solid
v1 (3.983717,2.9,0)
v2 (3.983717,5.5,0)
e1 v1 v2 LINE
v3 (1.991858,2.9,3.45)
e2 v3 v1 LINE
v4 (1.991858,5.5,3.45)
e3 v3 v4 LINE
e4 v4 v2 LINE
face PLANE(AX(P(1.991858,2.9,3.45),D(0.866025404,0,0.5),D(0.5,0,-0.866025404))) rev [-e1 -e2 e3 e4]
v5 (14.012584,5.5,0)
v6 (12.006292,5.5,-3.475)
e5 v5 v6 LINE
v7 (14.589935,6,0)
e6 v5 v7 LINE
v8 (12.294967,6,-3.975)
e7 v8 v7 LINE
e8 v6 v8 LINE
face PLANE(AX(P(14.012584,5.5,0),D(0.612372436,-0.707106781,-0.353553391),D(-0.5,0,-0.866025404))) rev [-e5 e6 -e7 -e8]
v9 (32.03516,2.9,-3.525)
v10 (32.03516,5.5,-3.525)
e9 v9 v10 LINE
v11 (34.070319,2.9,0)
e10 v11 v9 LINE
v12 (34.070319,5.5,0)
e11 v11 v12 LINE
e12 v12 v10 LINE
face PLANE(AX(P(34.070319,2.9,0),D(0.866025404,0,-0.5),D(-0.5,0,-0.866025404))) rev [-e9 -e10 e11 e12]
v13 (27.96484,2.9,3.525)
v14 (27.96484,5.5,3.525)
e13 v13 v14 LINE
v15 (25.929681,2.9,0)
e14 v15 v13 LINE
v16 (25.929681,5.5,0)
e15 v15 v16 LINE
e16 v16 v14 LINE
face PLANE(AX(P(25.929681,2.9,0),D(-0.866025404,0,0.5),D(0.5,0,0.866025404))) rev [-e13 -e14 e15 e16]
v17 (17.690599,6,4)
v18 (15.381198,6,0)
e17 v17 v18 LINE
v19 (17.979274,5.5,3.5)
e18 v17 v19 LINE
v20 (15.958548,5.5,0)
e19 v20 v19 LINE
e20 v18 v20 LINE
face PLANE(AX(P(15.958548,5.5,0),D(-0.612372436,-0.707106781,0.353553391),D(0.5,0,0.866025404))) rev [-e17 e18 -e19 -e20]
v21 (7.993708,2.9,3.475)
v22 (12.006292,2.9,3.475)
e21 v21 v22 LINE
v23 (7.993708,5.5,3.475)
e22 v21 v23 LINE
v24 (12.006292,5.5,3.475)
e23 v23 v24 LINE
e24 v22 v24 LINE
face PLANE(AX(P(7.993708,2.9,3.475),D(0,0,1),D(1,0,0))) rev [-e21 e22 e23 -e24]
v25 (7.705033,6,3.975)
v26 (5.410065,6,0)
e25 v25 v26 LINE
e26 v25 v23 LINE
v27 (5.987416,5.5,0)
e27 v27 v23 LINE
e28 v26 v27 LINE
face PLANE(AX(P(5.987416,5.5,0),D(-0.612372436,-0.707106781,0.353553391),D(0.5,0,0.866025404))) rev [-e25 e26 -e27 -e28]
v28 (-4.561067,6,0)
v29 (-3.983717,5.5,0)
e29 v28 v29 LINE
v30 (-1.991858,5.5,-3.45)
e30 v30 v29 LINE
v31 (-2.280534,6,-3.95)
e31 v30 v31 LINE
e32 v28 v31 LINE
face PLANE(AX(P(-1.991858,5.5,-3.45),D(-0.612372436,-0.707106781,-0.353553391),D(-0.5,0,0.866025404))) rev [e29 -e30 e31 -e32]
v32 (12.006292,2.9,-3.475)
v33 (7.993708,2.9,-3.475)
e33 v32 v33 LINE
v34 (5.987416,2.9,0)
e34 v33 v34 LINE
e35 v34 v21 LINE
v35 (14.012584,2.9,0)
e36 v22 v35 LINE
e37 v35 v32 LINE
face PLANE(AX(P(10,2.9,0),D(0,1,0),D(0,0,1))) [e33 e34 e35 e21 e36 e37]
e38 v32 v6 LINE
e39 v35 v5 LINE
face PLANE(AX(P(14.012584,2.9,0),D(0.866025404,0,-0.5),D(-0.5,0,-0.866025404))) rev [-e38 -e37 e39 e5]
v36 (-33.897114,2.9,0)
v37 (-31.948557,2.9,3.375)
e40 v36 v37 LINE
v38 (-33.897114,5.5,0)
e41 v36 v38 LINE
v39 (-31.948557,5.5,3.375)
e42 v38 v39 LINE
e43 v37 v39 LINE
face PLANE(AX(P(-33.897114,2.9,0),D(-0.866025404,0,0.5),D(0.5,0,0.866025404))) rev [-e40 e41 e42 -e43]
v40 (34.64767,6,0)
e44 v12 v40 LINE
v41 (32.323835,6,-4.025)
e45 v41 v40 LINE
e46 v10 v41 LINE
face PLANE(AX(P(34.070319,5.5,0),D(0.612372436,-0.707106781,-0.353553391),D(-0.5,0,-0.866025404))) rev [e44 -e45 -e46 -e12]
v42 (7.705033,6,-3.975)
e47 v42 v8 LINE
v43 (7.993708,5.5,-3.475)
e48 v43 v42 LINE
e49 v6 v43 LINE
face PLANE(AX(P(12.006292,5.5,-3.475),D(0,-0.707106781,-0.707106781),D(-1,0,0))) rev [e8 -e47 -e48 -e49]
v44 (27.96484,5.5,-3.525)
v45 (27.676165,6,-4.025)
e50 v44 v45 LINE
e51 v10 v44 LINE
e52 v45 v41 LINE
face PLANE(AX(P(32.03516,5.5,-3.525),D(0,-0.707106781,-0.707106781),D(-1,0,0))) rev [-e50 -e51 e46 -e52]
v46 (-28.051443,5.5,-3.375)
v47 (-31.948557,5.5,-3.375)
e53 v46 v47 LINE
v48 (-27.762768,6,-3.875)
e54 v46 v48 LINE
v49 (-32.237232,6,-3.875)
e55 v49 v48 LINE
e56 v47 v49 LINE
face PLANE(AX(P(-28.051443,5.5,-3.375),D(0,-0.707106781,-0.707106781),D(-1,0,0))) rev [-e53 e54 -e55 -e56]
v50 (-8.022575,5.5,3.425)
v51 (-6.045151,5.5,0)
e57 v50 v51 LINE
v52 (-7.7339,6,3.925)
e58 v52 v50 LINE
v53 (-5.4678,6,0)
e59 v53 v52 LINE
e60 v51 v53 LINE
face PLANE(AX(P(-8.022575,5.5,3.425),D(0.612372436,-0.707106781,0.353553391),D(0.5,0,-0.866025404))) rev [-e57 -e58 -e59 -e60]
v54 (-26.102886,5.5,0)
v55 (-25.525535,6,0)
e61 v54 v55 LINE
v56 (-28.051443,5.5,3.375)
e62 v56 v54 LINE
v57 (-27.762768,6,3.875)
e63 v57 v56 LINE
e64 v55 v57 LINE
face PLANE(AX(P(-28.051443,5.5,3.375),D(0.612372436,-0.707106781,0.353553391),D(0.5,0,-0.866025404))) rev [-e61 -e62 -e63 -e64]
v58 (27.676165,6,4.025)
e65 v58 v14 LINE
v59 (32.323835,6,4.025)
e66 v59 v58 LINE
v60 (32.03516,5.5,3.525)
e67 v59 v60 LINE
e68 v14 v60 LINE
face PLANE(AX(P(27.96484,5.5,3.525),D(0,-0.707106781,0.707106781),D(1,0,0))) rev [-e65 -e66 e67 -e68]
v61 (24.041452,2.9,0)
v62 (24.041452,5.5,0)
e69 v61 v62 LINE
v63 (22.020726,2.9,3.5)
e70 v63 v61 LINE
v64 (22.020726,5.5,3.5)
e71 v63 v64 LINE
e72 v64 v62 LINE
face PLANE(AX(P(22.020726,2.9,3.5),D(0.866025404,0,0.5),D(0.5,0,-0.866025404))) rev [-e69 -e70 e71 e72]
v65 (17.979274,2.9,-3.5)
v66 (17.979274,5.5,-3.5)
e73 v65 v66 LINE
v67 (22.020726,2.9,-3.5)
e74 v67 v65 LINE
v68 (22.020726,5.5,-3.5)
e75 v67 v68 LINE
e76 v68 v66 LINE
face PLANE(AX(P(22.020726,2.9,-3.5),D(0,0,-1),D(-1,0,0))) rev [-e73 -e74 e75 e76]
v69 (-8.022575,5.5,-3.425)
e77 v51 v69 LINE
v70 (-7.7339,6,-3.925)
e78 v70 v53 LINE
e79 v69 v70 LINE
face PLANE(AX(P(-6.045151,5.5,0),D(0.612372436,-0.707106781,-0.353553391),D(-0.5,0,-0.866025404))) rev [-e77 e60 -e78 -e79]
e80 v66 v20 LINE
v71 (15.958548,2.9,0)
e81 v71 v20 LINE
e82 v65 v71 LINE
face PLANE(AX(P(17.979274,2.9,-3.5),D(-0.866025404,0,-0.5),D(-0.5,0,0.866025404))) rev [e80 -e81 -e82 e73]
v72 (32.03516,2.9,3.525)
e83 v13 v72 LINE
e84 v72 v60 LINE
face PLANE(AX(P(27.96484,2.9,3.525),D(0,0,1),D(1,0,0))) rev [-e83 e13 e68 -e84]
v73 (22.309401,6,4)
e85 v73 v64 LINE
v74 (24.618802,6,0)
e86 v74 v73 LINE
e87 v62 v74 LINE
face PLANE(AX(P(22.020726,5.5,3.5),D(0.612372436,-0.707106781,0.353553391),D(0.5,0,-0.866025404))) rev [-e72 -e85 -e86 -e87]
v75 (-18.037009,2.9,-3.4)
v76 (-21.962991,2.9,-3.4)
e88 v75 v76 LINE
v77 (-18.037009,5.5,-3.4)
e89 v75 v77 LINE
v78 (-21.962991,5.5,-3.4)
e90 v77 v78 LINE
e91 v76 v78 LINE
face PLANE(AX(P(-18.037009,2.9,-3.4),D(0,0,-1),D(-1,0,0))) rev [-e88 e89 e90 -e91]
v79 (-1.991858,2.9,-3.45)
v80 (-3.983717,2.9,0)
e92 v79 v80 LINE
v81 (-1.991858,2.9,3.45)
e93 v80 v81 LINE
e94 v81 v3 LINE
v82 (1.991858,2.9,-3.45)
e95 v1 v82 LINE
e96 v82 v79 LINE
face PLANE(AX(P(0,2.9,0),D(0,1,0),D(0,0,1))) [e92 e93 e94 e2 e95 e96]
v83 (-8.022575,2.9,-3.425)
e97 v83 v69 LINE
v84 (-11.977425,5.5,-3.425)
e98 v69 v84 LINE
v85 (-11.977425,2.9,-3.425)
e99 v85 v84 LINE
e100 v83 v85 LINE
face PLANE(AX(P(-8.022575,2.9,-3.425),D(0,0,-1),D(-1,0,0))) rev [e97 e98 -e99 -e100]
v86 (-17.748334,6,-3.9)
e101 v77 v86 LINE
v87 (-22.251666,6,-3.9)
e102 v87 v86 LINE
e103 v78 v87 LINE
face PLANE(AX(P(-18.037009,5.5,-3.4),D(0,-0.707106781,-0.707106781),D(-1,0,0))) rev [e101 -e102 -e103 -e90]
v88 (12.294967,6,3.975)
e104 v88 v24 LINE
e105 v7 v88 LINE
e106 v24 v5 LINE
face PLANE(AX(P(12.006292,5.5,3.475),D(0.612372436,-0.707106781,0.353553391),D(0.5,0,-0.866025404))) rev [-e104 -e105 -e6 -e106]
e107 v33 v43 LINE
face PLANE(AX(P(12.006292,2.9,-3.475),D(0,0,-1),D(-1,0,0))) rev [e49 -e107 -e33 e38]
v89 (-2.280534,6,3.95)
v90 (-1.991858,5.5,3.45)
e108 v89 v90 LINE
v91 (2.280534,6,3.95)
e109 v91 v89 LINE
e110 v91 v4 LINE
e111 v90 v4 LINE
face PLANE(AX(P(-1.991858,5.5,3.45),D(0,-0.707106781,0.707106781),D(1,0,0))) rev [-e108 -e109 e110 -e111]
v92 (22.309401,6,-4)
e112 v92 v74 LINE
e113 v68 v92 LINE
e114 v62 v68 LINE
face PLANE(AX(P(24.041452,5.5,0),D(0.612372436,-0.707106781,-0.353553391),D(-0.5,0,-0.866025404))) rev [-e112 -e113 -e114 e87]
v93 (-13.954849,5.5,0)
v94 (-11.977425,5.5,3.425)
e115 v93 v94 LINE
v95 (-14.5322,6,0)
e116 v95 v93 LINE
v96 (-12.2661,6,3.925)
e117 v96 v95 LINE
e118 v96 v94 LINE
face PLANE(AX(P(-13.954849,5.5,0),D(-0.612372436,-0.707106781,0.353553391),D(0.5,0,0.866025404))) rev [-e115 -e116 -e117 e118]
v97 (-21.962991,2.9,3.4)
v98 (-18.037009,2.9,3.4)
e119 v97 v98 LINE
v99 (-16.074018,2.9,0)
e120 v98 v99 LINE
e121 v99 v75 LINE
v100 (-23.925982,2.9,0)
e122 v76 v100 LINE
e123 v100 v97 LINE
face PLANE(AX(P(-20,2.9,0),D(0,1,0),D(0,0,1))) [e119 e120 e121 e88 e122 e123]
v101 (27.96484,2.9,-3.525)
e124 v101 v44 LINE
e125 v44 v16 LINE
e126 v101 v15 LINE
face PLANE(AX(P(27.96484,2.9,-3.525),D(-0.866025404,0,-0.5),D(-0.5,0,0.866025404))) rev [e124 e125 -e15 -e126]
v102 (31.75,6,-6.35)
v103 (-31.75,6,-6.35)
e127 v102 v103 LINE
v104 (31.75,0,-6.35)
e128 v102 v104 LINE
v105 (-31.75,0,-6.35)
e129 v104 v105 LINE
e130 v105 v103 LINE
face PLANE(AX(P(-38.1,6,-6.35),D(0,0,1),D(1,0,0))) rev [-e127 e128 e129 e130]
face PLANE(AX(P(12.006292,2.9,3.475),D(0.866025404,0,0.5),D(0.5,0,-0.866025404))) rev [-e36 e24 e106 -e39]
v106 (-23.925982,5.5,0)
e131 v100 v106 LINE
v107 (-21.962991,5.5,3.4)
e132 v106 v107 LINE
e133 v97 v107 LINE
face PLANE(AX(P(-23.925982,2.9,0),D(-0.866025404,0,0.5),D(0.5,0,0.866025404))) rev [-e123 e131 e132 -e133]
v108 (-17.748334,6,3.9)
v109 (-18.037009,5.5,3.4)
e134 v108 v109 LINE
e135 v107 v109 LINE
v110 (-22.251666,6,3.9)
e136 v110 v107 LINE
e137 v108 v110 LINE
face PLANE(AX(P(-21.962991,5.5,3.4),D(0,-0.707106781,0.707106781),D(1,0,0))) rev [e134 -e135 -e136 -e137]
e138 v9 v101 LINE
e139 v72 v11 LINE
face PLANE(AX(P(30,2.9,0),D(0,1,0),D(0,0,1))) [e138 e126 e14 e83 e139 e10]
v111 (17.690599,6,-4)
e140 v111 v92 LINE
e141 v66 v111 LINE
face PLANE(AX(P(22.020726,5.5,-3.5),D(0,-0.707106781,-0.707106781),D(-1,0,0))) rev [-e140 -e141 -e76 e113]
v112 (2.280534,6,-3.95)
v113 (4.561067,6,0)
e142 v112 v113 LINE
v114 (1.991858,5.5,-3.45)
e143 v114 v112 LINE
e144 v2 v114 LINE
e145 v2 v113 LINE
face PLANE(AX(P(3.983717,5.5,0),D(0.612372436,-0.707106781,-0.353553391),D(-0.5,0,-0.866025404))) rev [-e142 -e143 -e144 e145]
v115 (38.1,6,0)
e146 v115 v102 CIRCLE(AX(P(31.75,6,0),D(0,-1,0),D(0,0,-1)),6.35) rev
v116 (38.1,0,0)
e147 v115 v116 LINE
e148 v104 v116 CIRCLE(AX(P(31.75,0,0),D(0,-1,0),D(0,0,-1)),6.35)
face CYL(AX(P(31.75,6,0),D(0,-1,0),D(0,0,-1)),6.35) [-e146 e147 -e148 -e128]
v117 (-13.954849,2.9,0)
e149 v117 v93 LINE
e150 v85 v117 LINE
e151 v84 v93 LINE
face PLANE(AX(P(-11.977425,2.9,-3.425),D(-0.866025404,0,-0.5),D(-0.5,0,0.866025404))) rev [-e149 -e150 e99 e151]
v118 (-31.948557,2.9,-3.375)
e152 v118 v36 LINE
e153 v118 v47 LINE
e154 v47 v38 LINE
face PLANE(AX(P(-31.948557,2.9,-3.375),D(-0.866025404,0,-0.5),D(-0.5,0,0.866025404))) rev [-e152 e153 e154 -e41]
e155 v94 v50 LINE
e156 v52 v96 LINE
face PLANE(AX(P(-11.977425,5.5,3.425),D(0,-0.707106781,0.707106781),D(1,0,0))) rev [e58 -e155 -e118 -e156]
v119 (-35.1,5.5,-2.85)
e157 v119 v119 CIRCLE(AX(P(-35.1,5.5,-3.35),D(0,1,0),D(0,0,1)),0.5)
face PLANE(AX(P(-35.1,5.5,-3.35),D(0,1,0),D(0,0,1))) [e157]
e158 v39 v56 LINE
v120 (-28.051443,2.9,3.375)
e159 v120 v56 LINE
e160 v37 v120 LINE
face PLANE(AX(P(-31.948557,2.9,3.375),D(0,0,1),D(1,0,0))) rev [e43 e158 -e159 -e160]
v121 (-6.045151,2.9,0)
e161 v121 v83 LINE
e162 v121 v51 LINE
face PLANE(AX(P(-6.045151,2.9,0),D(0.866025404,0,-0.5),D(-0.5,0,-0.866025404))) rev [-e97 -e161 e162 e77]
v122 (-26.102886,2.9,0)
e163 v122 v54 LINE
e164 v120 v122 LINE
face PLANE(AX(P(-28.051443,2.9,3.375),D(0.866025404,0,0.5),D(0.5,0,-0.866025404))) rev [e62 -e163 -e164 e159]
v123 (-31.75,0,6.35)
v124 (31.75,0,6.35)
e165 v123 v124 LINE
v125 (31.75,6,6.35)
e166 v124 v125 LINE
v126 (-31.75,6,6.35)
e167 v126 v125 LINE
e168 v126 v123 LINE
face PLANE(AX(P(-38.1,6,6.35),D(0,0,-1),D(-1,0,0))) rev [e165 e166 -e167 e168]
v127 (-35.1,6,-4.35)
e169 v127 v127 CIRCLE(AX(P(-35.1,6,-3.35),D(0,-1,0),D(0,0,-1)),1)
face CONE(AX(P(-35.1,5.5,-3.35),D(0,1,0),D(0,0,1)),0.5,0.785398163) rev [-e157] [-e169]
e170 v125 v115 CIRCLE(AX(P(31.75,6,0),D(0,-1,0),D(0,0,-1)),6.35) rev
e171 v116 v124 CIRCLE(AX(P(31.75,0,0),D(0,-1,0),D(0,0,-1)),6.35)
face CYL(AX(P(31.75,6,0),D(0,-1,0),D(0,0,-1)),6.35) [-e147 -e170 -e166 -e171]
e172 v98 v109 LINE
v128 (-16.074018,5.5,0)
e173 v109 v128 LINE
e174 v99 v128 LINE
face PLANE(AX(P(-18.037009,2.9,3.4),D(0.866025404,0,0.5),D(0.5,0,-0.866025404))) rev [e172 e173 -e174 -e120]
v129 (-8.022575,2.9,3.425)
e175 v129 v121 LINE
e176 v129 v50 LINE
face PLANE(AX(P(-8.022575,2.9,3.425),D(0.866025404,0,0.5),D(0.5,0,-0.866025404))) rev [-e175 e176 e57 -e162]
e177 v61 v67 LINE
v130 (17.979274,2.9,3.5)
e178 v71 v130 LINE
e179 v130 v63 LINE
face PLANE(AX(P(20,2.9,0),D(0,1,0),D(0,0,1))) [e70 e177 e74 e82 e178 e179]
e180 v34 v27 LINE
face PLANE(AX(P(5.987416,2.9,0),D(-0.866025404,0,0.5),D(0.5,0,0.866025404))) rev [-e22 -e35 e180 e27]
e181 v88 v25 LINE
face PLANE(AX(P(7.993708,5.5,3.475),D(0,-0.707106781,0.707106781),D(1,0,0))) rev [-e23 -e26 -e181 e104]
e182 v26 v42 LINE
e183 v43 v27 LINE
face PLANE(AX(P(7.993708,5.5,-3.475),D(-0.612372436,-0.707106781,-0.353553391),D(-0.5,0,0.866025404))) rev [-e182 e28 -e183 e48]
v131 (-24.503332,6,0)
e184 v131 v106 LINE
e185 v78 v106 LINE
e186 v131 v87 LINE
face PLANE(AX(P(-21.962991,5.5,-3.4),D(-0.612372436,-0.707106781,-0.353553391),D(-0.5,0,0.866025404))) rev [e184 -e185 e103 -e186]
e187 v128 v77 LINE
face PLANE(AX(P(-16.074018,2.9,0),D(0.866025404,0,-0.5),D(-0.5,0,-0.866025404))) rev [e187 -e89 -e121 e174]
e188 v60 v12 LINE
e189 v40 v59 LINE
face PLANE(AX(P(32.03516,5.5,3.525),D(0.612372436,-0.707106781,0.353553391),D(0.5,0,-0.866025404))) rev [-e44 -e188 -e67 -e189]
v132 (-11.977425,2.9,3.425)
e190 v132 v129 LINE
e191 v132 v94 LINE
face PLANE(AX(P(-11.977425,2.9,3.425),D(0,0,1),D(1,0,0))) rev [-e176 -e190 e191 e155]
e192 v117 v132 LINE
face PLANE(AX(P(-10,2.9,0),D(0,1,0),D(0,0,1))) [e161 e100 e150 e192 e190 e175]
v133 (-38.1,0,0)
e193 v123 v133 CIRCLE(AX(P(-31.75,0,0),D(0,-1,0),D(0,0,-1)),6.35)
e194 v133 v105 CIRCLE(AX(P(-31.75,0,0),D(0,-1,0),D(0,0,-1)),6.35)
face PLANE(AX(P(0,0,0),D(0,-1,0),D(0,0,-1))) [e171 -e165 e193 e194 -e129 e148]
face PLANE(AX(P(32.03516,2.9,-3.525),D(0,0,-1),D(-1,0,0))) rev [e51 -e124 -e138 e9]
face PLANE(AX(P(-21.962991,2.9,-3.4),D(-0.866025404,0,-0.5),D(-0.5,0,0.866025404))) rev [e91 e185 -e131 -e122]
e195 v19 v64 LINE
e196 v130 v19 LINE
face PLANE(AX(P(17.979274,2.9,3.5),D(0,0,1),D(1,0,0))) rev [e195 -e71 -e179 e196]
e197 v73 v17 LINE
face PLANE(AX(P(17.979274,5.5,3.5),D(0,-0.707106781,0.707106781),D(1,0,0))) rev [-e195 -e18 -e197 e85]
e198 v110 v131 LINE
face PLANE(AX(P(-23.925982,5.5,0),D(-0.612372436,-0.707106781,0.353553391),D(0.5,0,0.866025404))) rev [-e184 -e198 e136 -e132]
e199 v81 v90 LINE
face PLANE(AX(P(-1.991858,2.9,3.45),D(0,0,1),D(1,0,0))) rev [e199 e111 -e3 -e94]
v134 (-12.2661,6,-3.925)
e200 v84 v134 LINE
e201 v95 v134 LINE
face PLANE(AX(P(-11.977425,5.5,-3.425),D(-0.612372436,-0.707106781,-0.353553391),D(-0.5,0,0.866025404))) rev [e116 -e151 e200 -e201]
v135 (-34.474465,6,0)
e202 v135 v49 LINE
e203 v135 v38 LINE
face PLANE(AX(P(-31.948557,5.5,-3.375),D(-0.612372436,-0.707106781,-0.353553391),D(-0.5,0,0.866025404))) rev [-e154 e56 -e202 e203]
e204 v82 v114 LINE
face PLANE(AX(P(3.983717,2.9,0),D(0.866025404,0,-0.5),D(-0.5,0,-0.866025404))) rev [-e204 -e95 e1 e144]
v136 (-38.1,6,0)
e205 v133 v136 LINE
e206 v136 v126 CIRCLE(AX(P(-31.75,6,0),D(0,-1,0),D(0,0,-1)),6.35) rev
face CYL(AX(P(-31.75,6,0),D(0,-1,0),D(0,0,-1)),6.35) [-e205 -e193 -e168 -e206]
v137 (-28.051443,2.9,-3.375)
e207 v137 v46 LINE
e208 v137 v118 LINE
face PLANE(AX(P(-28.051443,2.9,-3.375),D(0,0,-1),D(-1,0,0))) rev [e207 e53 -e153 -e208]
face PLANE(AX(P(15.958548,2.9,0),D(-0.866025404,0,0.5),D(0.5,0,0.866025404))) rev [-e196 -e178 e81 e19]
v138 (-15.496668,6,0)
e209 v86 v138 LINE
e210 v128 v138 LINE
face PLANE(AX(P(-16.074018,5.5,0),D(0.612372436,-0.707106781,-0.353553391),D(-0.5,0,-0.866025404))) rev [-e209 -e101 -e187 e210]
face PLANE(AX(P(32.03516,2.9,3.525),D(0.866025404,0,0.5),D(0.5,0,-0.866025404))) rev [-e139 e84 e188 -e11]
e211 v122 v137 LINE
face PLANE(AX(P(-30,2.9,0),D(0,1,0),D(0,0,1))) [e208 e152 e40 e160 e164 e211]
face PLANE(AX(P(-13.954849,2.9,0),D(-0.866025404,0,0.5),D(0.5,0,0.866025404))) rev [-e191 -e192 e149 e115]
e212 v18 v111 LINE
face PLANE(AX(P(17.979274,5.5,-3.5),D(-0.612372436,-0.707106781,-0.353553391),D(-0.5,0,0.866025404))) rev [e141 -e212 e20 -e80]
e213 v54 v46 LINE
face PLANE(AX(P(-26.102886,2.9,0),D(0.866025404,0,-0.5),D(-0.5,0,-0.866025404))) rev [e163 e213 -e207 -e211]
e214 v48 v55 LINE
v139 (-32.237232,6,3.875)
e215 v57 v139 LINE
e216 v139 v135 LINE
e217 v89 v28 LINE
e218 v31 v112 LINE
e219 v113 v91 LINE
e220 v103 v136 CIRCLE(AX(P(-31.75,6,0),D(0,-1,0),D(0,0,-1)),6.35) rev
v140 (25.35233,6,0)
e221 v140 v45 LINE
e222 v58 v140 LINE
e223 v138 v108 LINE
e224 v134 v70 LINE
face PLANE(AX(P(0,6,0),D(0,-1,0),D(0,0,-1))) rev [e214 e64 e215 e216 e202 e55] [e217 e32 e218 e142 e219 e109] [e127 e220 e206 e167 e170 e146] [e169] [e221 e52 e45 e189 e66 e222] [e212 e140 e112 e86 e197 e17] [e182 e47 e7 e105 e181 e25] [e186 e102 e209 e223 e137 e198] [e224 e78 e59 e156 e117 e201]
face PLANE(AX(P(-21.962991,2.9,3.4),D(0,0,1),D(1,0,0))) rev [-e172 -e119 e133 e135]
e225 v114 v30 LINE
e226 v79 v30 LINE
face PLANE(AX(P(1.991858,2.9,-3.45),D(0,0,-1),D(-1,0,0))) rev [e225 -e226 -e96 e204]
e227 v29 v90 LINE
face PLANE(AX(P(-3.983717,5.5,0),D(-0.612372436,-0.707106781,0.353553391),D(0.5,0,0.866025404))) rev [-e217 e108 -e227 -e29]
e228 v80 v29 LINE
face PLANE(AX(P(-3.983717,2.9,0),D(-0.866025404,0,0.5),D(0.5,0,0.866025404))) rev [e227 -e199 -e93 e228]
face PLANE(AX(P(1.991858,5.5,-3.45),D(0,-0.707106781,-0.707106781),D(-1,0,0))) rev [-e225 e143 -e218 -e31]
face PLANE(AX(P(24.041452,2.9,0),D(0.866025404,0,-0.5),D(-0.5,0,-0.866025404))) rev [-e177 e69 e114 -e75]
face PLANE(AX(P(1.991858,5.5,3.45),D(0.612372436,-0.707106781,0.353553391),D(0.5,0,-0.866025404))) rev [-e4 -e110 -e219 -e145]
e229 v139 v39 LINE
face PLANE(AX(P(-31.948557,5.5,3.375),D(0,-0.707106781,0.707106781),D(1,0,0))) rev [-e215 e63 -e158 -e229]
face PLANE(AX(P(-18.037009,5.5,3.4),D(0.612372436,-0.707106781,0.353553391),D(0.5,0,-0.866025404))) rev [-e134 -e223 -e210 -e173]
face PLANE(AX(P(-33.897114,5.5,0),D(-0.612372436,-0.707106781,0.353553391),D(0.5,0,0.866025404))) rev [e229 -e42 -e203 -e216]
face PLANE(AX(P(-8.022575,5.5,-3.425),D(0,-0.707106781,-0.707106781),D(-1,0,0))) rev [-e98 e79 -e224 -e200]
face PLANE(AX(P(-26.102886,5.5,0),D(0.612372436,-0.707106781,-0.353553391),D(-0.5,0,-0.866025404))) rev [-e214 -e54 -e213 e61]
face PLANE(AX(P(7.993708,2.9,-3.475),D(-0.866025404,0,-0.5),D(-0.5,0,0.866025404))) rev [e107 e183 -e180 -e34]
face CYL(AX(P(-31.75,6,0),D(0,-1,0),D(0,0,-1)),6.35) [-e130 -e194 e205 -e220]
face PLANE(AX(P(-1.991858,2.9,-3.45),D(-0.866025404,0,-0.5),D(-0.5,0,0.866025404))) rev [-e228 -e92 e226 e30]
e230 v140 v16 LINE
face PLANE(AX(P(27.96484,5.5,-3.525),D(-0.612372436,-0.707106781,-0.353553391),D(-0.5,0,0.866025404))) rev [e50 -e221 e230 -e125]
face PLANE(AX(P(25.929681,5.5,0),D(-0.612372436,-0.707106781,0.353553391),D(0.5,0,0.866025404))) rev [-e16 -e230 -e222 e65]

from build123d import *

# Parameters (mm, degrees)
SKETCH1_W           = 76.2
SKETCH1_H           = 12.7
BOSS_EXTRUDE1_DEPTH = 6
CUT_EXTRUDE1_DEPTH  = 3.1
LPATTERN1_START     = 2.9
LPATTERN1_DEPTH     = 3.1
SKETCH3_R           = 0.5
CUT_EXTRUDE2_DEPTH  = 0.5
FILLET1_R           = 6.35
CHAMFER1_SIZE       = 0.5


# Read off the part's stored shape, not the designer's step: LPattern1
with BuildPart() as part:
    # Sketch1 → Boss-Extrude1 (new body)
    with BuildSketch(Plane(origin=(0, 0, 0), x_dir=(1, 0, 0), z_dir=(0, 1, 0))):
        Rectangle(SKETCH1_W, SKETCH1_H)
    extrude(amount=BOSS_EXTRUDE1_DEPTH)

    # Sketch2 → Cut-Extrude1 (cut)
    with BuildSketch(Plane(origin=(0, 6, 0), x_dir=(1, 0, 0), z_dir=(0, 1, 0))):
        Polygon((1.991858429, 3.45), (-1.991858429, 3.45), (-3.983716857, 0), (-1.991858429, -3.45), (1.991858429, -3.45), (3.983716857, 0), align=None)
    extrude(amount=-CUT_EXTRUDE1_DEPTH, mode=Mode.SUBTRACT)

    # LPattern1 outline → LPattern1 (cut)
    with BuildSketch(Plane(origin=(0, 0, 0), x_dir=(1, 0, 0), z_dir=(0, 1, 0)).offset(LPATTERN1_START)):
        Polygon((-8.022575328, -3.425), (-6.045150656, 0), (-8.022575328, 3.425), (-11.977424672, 3.425), (-13.954849344, 0), (-11.977424672, -3.425), align=None)
        Polygon((-18.037009085, -3.4), (-16.07401817, 0), (-18.037009085, 3.4), (-21.962990915, 3.4), (-23.92598183, 0), (-21.962990915, -3.4), align=None)
        Polygon((-28.051442841, -3.375), (-26.102885683, 0), (-28.051442841, 3.375), (-31.948557159, 3.375), (-33.897114317, 0), (-31.948557159, -3.375), align=None)
        Polygon((12.006292185, -3.475), (14.012584371, 0), (12.006292185, 3.475), (7.993707815, 3.475), (5.987415629, 0), (7.993707815, -3.475), align=None)
        Polygon((22.020725942, -3.5), (24.041451884, 0), (22.020725942, 3.5), (17.979274058, 3.5), (15.958548116, 0), (17.979274058, -3.5), align=None)
        Polygon((32.035159699, -3.525), (34.070319398, 0), (32.035159699, 3.525), (27.964840301, 3.525), (25.929680602, 0), (27.964840301, -3.525), align=None)
    extrude(amount=LPATTERN1_DEPTH, mode=Mode.SUBTRACT)

    # Sketch3 → Cut-Extrude2 (cut)
    with BuildSketch(Plane(origin=(0, 6, 0), x_dir=(1, 0, 0), z_dir=(0, 1, 0))):
        with Locations(Location((-35.1, 3.35, 0), (0, 0, 270))):
            Circle(SKETCH3_R)
    extrude(amount=-CUT_EXTRUDE2_DEPTH, mode=Mode.SUBTRACT)

    # Fillet1
    fillet1_edges = [part.edges().sort_by_distance(p)[0] for p in [
        (38.1, 3, -6.35),
        (38.1, 3, 6.35),
        (-38.1, 3, -6.35),
        (-38.1, 3, 6.35),
    ]]
    fillet(fillet1_edges, radius=FILLET1_R - 0.0001)  # a hair under: the kernel refuses the full size

    # Chamfer1
    chamfer1_edges = [part.edges().sort_by_distance(p)[0] for p in [
        (-35.1, 6, -3.85),
        (2.987787643, 6, -1.725),
        (0, 6, -3.45),
        (-2.987787643, 6, -1.725),
        (-2.987787643, 6, 1.725),
        (0, 6, 3.45),
        (2.987787643, 6, 1.725),
        (33.052739548, 6, -1.7625),
        (30, 6, -3.525),
        (26.947260452, 6, -1.7625),
        (26.947260452, 6, 1.7625),
        (30, 6, 3.525),
        (33.052739548, 6, 1.7625),
        (23.031088913, 6, -1.75),
        (20, 6, -3.5),
        (16.968911087, 6, -1.75),
        (16.968911087, 6, 1.75),
        (20, 6, 3.5),
        (23.031088913, 6, 1.75),
        (13.009438278, 6, -1.7375),
        (10, 6, -3.475),
        (6.990561722, 6, -1.7375),
        (6.990561722, 6, 1.7375),
        (10, 6, 3.475),
        (13.009438278, 6, 1.7375),
        (-27.077164262, 6, -1.6875),
        (-30, 6, -3.375),
        (-32.922835738, 6, -1.6875),
        (-32.922835738, 6, 1.6875),
        (-30, 6, 3.375),
        (-27.077164262, 6, 1.6875),
        (-17.055513628, 6, -1.7),
        (-20, 6, -3.4),
        (-22.944486373, 6, -1.7),
        (-22.944486372, 6, 1.7),
        (-20, 6, 3.4),
        (-17.055513627, 6, 1.7),
        (-7.033862992, 6, -1.7125),
        (-10, 6, -3.425),
        (-12.966137008, 6, -1.7125),
        (-12.966137008, 6, 1.7125),
        (-10, 6, 3.425),
        (-7.033862992, 6, 1.7125),
    ]]
    chamfer(chamfer1_edges, length=CHAMFER1_SIZE - 0.0001)  # a hair under: the kernel refuses the full size


solid = part.part
